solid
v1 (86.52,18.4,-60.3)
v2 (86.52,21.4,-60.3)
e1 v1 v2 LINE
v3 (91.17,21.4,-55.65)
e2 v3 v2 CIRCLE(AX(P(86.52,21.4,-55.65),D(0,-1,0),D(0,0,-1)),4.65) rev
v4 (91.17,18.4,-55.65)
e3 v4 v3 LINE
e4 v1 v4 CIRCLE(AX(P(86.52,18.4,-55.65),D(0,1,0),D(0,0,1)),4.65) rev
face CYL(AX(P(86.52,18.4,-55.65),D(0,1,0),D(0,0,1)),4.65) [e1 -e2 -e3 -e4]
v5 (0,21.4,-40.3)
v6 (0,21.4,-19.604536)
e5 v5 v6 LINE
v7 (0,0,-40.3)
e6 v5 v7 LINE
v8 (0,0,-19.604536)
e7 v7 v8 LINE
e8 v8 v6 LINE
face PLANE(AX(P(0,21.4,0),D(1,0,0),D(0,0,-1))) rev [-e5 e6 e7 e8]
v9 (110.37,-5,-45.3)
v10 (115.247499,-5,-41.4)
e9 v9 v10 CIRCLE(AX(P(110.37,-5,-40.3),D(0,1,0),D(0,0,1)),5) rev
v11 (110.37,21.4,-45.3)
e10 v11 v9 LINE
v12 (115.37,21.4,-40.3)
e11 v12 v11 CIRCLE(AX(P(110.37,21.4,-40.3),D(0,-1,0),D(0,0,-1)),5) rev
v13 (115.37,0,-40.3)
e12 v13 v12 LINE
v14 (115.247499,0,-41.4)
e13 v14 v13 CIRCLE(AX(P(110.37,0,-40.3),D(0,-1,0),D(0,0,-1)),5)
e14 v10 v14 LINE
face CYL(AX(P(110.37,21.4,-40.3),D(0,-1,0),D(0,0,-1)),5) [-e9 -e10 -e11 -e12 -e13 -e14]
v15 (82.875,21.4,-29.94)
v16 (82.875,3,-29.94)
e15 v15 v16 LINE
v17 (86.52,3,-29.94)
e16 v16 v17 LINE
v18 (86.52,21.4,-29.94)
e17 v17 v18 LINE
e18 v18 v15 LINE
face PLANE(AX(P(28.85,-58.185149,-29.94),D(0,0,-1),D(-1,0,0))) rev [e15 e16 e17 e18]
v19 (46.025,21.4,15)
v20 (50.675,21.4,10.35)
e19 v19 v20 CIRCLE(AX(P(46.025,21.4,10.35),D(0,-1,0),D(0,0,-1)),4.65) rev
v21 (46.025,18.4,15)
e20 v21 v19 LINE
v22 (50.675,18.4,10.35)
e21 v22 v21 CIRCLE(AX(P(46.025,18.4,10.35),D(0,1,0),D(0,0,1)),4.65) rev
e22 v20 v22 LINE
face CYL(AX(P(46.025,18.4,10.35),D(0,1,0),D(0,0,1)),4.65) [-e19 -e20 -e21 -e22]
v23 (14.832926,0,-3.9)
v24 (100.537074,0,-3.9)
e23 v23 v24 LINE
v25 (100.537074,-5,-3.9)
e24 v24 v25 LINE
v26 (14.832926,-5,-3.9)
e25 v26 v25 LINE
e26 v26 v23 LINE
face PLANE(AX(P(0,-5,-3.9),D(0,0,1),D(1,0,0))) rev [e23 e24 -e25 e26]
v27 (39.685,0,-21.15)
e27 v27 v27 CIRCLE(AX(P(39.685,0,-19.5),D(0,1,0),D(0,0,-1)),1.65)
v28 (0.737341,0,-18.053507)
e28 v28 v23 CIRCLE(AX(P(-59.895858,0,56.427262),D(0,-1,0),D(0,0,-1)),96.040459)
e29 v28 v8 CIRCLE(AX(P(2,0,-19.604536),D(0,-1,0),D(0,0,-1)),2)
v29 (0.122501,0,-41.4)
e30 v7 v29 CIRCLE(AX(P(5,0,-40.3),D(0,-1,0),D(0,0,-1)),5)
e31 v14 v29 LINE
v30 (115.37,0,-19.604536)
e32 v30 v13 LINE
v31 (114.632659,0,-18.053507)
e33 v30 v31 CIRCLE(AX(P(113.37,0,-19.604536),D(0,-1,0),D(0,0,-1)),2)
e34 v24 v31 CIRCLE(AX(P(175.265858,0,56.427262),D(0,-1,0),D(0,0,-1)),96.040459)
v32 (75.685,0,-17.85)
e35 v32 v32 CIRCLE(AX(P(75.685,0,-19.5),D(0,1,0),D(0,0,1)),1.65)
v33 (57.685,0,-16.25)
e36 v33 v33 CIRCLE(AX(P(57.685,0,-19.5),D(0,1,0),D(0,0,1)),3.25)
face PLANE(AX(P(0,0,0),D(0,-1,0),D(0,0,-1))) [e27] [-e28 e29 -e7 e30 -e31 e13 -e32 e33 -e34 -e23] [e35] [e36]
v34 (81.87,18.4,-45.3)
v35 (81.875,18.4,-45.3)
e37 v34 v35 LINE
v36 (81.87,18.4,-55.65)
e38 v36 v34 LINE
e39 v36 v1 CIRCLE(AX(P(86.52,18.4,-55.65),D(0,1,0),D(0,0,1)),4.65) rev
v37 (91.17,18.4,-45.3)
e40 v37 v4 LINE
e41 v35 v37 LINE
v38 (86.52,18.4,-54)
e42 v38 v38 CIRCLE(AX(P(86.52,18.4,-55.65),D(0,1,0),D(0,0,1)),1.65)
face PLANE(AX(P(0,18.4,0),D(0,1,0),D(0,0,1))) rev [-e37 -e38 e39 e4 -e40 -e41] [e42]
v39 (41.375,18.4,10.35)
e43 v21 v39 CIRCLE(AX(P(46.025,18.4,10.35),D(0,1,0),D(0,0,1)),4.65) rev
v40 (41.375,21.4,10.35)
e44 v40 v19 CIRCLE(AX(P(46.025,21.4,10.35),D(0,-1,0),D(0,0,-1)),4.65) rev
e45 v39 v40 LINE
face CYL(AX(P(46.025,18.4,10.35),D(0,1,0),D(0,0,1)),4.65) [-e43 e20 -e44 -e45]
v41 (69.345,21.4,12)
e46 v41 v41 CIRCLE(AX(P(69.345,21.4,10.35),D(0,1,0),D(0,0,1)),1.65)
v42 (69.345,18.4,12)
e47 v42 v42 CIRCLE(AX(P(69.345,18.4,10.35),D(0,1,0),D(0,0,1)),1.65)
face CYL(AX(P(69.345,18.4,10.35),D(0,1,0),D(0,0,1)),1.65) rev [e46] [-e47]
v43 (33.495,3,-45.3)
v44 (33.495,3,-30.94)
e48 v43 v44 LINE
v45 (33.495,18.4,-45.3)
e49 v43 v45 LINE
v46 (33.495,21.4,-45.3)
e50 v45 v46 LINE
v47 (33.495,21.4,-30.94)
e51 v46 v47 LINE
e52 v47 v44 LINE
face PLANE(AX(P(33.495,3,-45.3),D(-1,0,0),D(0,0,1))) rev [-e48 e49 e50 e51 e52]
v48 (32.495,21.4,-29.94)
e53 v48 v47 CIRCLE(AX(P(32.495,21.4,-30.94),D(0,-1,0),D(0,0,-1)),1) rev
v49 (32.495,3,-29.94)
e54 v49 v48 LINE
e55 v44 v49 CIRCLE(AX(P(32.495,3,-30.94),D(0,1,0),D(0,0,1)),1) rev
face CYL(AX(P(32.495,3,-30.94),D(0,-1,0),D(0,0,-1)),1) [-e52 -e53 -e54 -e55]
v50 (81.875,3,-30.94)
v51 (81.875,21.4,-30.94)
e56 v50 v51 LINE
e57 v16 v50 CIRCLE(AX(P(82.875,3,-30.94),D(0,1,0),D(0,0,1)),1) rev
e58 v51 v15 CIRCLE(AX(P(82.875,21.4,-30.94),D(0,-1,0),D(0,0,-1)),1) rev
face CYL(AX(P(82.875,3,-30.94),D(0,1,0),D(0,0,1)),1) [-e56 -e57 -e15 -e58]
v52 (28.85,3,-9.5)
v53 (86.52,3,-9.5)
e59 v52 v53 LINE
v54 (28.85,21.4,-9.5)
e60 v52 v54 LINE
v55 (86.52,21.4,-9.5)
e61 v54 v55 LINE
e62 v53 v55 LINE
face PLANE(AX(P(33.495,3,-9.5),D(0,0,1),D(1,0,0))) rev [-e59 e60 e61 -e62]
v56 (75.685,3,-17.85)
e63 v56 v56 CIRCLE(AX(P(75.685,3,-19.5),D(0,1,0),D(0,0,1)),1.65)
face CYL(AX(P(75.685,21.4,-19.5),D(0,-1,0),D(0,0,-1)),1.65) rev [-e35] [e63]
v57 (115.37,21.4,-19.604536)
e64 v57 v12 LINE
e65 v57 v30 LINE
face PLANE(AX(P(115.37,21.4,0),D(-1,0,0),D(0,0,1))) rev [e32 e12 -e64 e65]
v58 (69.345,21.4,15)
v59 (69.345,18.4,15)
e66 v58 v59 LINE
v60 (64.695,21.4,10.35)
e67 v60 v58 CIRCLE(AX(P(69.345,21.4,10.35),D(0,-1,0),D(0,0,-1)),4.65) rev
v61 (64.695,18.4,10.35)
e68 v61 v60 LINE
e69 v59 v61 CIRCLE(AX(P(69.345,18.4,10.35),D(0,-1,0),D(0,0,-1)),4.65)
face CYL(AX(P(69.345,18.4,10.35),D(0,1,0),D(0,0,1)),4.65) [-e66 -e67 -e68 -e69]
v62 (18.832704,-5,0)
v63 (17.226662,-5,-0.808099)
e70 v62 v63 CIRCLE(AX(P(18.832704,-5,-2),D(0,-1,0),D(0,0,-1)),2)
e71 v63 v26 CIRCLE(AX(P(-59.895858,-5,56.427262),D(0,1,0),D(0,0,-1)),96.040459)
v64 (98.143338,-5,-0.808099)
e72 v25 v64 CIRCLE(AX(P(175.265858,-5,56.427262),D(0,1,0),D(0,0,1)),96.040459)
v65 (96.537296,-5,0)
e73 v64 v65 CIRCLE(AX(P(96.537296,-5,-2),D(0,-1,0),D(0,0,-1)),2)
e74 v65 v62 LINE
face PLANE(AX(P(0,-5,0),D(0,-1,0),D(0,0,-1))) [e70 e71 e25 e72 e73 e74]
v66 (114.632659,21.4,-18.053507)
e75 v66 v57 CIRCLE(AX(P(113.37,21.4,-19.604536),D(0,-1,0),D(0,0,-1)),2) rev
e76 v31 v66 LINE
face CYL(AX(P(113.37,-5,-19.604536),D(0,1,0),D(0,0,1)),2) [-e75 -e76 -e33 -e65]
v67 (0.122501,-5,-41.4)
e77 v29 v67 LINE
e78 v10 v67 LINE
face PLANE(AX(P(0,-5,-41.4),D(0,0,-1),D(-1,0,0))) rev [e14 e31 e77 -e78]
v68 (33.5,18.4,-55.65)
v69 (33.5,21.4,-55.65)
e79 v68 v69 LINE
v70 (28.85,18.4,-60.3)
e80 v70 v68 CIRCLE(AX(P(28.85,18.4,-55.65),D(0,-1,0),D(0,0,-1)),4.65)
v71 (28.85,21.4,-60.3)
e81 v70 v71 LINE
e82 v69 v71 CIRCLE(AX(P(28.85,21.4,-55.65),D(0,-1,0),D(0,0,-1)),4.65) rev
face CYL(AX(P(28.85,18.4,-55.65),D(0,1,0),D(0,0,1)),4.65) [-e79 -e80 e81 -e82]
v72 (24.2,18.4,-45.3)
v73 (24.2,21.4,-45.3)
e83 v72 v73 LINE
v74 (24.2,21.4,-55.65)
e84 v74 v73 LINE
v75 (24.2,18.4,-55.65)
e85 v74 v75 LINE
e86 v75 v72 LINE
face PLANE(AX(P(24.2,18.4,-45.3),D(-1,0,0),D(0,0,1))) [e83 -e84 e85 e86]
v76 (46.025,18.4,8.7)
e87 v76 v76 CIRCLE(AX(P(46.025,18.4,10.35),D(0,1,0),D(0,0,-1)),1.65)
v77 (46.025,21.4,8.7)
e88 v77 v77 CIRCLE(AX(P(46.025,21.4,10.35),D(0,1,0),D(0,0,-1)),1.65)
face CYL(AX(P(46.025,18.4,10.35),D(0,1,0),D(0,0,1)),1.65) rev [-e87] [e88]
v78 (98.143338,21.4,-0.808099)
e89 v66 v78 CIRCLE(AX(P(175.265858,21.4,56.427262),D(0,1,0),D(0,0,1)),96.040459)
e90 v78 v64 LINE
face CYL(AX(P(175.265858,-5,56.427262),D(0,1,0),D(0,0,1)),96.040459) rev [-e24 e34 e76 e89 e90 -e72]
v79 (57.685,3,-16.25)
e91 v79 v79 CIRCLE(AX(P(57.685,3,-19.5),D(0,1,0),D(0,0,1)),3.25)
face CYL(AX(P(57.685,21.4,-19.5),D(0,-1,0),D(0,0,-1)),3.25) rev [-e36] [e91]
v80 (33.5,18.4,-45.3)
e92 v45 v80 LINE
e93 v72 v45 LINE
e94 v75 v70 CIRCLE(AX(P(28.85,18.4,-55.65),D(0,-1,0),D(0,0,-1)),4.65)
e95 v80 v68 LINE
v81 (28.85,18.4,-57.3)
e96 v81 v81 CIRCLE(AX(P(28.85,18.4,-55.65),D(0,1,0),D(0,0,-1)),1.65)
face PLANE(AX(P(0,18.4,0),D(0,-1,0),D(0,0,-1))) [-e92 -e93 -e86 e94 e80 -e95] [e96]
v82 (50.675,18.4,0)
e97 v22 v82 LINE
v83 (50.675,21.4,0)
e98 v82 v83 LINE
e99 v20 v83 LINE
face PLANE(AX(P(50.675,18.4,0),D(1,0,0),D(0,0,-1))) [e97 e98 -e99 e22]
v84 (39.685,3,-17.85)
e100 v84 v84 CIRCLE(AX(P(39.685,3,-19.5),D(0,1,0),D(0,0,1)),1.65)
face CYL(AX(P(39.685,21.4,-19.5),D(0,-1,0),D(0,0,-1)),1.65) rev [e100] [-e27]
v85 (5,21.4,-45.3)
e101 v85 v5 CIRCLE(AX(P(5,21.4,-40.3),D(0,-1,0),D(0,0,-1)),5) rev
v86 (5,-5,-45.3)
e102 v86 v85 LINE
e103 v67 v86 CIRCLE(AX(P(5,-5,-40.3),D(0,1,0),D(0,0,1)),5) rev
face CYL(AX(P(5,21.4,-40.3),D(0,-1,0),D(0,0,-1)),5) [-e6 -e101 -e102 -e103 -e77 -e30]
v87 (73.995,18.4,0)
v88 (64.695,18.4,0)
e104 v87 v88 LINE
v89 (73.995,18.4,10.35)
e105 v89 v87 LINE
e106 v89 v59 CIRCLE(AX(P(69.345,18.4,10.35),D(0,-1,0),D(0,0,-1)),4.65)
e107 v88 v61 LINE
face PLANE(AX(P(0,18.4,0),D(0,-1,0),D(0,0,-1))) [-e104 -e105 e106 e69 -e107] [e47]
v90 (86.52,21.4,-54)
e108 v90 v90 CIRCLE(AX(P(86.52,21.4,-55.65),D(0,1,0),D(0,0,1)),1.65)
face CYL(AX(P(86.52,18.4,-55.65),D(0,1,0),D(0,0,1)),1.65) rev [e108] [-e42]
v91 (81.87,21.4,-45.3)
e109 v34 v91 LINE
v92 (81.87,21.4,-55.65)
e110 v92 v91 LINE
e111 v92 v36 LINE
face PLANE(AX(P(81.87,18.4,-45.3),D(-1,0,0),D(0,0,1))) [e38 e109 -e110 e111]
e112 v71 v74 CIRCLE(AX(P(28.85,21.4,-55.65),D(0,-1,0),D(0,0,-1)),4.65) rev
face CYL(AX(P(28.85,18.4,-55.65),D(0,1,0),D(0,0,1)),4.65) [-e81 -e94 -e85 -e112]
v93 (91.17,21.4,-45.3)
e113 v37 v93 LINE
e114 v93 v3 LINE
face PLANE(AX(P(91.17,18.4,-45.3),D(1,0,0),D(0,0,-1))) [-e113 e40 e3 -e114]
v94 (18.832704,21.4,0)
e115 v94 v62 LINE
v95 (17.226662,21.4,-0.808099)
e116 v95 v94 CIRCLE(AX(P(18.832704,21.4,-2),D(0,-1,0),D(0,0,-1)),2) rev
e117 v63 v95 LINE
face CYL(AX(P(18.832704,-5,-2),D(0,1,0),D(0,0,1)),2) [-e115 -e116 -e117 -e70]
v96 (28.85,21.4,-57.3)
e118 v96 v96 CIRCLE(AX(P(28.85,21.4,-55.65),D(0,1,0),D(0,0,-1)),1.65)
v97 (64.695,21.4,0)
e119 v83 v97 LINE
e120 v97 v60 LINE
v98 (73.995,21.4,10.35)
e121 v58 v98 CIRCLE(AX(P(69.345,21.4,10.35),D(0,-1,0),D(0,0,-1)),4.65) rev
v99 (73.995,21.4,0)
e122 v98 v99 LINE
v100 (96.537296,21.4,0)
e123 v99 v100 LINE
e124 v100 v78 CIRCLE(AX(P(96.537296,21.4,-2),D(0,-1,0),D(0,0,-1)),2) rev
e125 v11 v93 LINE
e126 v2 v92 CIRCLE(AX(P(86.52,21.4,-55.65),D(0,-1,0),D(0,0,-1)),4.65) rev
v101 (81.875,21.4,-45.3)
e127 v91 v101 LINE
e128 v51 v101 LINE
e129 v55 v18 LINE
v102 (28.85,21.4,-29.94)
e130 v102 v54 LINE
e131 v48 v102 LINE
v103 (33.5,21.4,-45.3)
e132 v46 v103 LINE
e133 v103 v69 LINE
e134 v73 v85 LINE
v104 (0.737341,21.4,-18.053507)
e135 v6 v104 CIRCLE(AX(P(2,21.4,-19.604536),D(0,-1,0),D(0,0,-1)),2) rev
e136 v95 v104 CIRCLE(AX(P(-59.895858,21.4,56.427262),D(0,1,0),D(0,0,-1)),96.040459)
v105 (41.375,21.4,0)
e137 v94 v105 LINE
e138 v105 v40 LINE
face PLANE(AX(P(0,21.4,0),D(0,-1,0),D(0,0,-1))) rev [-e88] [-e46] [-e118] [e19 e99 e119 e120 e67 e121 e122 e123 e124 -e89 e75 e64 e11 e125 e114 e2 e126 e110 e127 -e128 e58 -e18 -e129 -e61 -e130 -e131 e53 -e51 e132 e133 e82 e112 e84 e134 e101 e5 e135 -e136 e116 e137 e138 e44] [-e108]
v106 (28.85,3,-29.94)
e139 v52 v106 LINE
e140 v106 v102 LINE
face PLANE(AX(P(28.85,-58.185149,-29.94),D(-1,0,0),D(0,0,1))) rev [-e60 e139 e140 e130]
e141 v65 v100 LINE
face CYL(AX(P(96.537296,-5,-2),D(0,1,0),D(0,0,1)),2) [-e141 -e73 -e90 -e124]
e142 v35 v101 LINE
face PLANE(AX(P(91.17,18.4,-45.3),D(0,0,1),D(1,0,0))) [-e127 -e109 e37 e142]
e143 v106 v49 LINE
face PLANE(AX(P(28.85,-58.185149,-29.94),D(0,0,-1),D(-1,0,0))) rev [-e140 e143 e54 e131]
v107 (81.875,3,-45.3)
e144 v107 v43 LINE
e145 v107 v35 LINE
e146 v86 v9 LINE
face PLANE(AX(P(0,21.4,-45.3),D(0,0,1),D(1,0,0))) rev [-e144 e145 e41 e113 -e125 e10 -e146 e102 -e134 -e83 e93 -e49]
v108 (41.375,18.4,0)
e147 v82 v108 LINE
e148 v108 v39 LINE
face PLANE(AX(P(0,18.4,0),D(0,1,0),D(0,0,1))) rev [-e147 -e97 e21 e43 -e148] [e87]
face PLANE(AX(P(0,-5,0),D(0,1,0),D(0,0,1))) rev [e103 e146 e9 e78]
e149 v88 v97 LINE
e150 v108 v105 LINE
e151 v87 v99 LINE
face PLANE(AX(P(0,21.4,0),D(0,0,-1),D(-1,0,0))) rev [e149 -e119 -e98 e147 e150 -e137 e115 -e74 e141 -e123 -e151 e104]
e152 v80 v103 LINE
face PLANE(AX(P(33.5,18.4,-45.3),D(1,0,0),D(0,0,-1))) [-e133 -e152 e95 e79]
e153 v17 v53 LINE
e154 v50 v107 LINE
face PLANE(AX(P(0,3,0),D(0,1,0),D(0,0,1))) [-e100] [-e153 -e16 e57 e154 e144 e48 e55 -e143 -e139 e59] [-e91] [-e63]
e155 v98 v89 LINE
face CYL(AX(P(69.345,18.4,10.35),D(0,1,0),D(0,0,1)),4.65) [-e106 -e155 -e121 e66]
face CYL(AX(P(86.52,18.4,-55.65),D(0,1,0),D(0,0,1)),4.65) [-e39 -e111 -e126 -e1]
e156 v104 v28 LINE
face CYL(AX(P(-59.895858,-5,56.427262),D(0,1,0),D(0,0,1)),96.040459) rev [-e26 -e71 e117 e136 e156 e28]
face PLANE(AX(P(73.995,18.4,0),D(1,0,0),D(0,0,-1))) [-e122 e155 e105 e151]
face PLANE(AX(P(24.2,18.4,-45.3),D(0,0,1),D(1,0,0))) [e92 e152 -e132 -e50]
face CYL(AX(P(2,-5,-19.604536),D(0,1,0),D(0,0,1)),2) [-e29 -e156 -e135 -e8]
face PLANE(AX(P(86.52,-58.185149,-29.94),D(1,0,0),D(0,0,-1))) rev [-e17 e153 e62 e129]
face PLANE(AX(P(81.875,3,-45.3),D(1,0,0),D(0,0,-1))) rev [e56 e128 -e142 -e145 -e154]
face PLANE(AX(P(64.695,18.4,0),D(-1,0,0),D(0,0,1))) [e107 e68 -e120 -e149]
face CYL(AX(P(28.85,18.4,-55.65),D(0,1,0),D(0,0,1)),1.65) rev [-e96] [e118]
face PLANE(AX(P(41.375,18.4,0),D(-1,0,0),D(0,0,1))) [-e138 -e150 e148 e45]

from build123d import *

# Parameters (mm, degrees)
CROQUIS2_W              = 115.37
CROQUIS2_H              = 45.3
CROQUIS2_R              = 3.25
CROQUIS2_R_2            = 1.65
SALIENTE_EXTRUIR1_DEPTH = 21.4
CROQUIS6_W              = 48.38
CROQUIS6_H              = 35.8
CORTAR_EXTRUIR1_DEPTH   = 18.4
CROQUIS9_W              = 9.3
CROQUIS9_H              = 15
CROQUIS9_R              = 1.65
SALIENTE_EXTRUIR4_DEPTH = 3
REDONDEO8_R             = 4.65
CROQUIS7_W              = 115.37
CROQUIS7_H              = 3.9
SALIENTE_EXTRUIR3_DEPTH = 5
REDONDEO2_R             = 5
CORTAR_EXTRUIR2_DEPTH   = 133.828035068
REDONDEO9_R             = 2
CROQUIS12_W             = 57.67
CROQUIS12_H             = 20.44
CORTAR_EXTRUIR3_DEPTH   = 18.4
REDONDEO10_R            = 1


with BuildPart() as part:
    # Croquis2 → Saliente-Extruir1 (new body)
    with BuildSketch(Plane(origin=(0, 0, 0), x_dir=(1, 0, 0), z_dir=(0, 1, 0))):
        with Locations((57.685, 22.65)):
            Rectangle(CROQUIS2_W, CROQUIS2_H)
        with Locations(Location((57.685, 19.5, 0), (0, 0, 270))):
            Circle(CROQUIS2_R, mode=Mode.SUBTRACT)
        with Locations(Location((75.685, 19.5, 0), (0, 0, 270))):
            Circle(CROQUIS2_R_2, mode=Mode.SUBTRACT)
        with Locations(Location((39.685, 19.5, 0), (0, 0, 90))):
            Circle(CROQUIS2_R_2, mode=Mode.SUBTRACT)
    extrude(amount=SALIENTE_EXTRUIR1_DEPTH)

    # Croquis6 → Cortar-Extruir1 (cut)
    with BuildSketch(Plane(origin=(0, 21.4, 0), x_dir=(1, 0, 0), z_dir=(0, 1, 0))):
        with Locations((57.685, 27.4)):
            Rectangle(CROQUIS6_W, CROQUIS6_H)
    extrude(amount=-CORTAR_EXTRUIR1_DEPTH, mode=Mode.SUBTRACT)

    # Croquis9 → Saliente-Extruir4 (add)
    # profile 1 of 4: a face of its own
    with BuildSketch(Plane(origin=(0, 21.4, 0), x_dir=(1, 0, 0), z_dir=(0, 1, 0))):
        with Locations((86.52, 52.8)):
            Rectangle(CROQUIS9_W, CROQUIS9_H)
        with Locations(Location((86.52, 55.65, 0), (0, 0, 270))):
            Circle(CROQUIS9_R, mode=Mode.SUBTRACT)
    # profile 2 of 4: a face of its own
    with BuildSketch(Plane(origin=(0, 21.4, 0), x_dir=(1, 0, 0), z_dir=(0, 1, 0))):
        with Locations((28.85, 52.8)):
            Rectangle(CROQUIS9_W, CROQUIS9_H)
        with Locations(Location((28.85, 55.65, 0), (0, 0, 90))):
            Circle(CROQUIS9_R, mode=Mode.SUBTRACT)
    # profile 3 of 4: a face of its own
    with BuildSketch(Plane(origin=(0, 21.4, 0), x_dir=(1, 0, 0), z_dir=(0, 1, 0))):
        with Locations((69.345, -7.5)):
            Rectangle(CROQUIS9_W, CROQUIS9_H)
        with Locations(Location((69.345, -10.35, 0), (0, 0, 270))):
            Circle(CROQUIS9_R, mode=Mode.SUBTRACT)
    # profile 4 of 4: a face of its own
    with BuildSketch(Plane(origin=(0, 21.4, 0), x_dir=(1, 0, 0), z_dir=(0, 1, 0))):
        with Locations((46.025, -7.5)):
            Rectangle(CROQUIS9_W, CROQUIS9_H)
        with Locations(Location((46.025, -10.35, 0), (0, 0, 90))):
            Circle(CROQUIS9_R, mode=Mode.SUBTRACT)
    extrude(amount=-SALIENTE_EXTRUIR4_DEPTH)

    # Redondeo8
    redondeo8_edges = [part.edges().sort_by_distance(p)[0] for p in [
        (73.995, 19.9, 15),
        (64.695, 19.9, 15),
        (41.375, 19.9, 15),
        (50.675, 19.9, 15),
        (91.17, 19.9, -60.3),
        (81.87, 19.9, -60.3),
        (33.5, 19.9, -60.3),
        (24.2, 19.9, -60.3),
    ]]
    fillet(redondeo8_edges, radius=REDONDEO8_R - 0.0001)  # a hair under: the kernel refuses the full size

    # Croquis7 → Saliente-Extruir3 (add)
    with BuildSketch(Plane.XZ):
        with Locations((57.685, -43.35)):
            Rectangle(CROQUIS7_W, CROQUIS7_H)
        with Locations((57.685, -1.95)):
            Rectangle(CROQUIS7_W, CROQUIS7_H)
    extrude(amount=SALIENTE_EXTRUIR3_DEPTH)

    # Redondeo2
    redondeo2_edges = [part.edges().sort_by_distance(p)[0] for p in [
        (0, 8.2, 0),
        (0, 8.2, -45.3),
        (115.37, 8.2, -45.3),
        (115.37, 8.2, 0),
    ]]
    fillet(redondeo2_edges, radius=REDONDEO2_R)

    # Croquis11 → Cortar-Extruir2 (cut, through all)
    with BuildSketch(Plane(origin=(0, 21.4, 0), x_dir=(1, 0, 0), z_dir=(0, 1, 0))):
        with BuildLine():
            Line((115.37, 18.647739407), (115.37, 5))
            ThreePointArc((115.37, 5), (113.905533906, 1.464466094), (110.37, 0))
            Line((110.37, 0), (97.550134045, 0))
            ThreePointArc((97.550134045, 0), (105.831202258, 9.924815779), (115.37, 18.647739407))
        make_face()
        with BuildLine():
            Line((0, 18.647739407), (0, 5))
            ThreePointArc((0, 5), (1.464466094, 1.464466094), (5, 0))
            Line((5, 0), (17.819865955, 0))
            ThreePointArc((17.819865955, 0), (9.538797742, 9.924815779), (0, 18.647739407))
        make_face()
    extrude(amount=-CORTAR_EXTRUIR2_DEPTH, mode=Mode.SUBTRACT)

    # Redondeo9
    redondeo9_edges = [part.edges().sort_by_distance(p)[0] for p in [
        (97.550134045, 8.2, 0),
        (115.37, 10.7, -18.647739407),
        (0, 10.7, -18.647739407),
        (17.819865955, 8.2, 0),
    ]]
    fillet(redondeo9_edges, radius=REDONDEO9_R)

    # Croquis12 → Cortar-Extruir3 (cut)
    with BuildSketch(Plane(origin=(0, 21.4, 0), x_dir=(1, 0, 0), z_dir=(0, 1, 0))):
        with Locations((57.685, 19.72)):
            Rectangle(CROQUIS12_W, CROQUIS12_H)
    extrude(amount=-CORTAR_EXTRUIR3_DEPTH, mode=Mode.SUBTRACT)

    # Redondeo10
    redondeo10_edges = [part.edges().sort_by_distance(p)[0] for p in [
        (33.495, 12.2, -29.94),
        (81.875, 12.2, -29.94),
    ]]
    fillet(redondeo10_edges, radius=REDONDEO10_R)


solid = part.part
